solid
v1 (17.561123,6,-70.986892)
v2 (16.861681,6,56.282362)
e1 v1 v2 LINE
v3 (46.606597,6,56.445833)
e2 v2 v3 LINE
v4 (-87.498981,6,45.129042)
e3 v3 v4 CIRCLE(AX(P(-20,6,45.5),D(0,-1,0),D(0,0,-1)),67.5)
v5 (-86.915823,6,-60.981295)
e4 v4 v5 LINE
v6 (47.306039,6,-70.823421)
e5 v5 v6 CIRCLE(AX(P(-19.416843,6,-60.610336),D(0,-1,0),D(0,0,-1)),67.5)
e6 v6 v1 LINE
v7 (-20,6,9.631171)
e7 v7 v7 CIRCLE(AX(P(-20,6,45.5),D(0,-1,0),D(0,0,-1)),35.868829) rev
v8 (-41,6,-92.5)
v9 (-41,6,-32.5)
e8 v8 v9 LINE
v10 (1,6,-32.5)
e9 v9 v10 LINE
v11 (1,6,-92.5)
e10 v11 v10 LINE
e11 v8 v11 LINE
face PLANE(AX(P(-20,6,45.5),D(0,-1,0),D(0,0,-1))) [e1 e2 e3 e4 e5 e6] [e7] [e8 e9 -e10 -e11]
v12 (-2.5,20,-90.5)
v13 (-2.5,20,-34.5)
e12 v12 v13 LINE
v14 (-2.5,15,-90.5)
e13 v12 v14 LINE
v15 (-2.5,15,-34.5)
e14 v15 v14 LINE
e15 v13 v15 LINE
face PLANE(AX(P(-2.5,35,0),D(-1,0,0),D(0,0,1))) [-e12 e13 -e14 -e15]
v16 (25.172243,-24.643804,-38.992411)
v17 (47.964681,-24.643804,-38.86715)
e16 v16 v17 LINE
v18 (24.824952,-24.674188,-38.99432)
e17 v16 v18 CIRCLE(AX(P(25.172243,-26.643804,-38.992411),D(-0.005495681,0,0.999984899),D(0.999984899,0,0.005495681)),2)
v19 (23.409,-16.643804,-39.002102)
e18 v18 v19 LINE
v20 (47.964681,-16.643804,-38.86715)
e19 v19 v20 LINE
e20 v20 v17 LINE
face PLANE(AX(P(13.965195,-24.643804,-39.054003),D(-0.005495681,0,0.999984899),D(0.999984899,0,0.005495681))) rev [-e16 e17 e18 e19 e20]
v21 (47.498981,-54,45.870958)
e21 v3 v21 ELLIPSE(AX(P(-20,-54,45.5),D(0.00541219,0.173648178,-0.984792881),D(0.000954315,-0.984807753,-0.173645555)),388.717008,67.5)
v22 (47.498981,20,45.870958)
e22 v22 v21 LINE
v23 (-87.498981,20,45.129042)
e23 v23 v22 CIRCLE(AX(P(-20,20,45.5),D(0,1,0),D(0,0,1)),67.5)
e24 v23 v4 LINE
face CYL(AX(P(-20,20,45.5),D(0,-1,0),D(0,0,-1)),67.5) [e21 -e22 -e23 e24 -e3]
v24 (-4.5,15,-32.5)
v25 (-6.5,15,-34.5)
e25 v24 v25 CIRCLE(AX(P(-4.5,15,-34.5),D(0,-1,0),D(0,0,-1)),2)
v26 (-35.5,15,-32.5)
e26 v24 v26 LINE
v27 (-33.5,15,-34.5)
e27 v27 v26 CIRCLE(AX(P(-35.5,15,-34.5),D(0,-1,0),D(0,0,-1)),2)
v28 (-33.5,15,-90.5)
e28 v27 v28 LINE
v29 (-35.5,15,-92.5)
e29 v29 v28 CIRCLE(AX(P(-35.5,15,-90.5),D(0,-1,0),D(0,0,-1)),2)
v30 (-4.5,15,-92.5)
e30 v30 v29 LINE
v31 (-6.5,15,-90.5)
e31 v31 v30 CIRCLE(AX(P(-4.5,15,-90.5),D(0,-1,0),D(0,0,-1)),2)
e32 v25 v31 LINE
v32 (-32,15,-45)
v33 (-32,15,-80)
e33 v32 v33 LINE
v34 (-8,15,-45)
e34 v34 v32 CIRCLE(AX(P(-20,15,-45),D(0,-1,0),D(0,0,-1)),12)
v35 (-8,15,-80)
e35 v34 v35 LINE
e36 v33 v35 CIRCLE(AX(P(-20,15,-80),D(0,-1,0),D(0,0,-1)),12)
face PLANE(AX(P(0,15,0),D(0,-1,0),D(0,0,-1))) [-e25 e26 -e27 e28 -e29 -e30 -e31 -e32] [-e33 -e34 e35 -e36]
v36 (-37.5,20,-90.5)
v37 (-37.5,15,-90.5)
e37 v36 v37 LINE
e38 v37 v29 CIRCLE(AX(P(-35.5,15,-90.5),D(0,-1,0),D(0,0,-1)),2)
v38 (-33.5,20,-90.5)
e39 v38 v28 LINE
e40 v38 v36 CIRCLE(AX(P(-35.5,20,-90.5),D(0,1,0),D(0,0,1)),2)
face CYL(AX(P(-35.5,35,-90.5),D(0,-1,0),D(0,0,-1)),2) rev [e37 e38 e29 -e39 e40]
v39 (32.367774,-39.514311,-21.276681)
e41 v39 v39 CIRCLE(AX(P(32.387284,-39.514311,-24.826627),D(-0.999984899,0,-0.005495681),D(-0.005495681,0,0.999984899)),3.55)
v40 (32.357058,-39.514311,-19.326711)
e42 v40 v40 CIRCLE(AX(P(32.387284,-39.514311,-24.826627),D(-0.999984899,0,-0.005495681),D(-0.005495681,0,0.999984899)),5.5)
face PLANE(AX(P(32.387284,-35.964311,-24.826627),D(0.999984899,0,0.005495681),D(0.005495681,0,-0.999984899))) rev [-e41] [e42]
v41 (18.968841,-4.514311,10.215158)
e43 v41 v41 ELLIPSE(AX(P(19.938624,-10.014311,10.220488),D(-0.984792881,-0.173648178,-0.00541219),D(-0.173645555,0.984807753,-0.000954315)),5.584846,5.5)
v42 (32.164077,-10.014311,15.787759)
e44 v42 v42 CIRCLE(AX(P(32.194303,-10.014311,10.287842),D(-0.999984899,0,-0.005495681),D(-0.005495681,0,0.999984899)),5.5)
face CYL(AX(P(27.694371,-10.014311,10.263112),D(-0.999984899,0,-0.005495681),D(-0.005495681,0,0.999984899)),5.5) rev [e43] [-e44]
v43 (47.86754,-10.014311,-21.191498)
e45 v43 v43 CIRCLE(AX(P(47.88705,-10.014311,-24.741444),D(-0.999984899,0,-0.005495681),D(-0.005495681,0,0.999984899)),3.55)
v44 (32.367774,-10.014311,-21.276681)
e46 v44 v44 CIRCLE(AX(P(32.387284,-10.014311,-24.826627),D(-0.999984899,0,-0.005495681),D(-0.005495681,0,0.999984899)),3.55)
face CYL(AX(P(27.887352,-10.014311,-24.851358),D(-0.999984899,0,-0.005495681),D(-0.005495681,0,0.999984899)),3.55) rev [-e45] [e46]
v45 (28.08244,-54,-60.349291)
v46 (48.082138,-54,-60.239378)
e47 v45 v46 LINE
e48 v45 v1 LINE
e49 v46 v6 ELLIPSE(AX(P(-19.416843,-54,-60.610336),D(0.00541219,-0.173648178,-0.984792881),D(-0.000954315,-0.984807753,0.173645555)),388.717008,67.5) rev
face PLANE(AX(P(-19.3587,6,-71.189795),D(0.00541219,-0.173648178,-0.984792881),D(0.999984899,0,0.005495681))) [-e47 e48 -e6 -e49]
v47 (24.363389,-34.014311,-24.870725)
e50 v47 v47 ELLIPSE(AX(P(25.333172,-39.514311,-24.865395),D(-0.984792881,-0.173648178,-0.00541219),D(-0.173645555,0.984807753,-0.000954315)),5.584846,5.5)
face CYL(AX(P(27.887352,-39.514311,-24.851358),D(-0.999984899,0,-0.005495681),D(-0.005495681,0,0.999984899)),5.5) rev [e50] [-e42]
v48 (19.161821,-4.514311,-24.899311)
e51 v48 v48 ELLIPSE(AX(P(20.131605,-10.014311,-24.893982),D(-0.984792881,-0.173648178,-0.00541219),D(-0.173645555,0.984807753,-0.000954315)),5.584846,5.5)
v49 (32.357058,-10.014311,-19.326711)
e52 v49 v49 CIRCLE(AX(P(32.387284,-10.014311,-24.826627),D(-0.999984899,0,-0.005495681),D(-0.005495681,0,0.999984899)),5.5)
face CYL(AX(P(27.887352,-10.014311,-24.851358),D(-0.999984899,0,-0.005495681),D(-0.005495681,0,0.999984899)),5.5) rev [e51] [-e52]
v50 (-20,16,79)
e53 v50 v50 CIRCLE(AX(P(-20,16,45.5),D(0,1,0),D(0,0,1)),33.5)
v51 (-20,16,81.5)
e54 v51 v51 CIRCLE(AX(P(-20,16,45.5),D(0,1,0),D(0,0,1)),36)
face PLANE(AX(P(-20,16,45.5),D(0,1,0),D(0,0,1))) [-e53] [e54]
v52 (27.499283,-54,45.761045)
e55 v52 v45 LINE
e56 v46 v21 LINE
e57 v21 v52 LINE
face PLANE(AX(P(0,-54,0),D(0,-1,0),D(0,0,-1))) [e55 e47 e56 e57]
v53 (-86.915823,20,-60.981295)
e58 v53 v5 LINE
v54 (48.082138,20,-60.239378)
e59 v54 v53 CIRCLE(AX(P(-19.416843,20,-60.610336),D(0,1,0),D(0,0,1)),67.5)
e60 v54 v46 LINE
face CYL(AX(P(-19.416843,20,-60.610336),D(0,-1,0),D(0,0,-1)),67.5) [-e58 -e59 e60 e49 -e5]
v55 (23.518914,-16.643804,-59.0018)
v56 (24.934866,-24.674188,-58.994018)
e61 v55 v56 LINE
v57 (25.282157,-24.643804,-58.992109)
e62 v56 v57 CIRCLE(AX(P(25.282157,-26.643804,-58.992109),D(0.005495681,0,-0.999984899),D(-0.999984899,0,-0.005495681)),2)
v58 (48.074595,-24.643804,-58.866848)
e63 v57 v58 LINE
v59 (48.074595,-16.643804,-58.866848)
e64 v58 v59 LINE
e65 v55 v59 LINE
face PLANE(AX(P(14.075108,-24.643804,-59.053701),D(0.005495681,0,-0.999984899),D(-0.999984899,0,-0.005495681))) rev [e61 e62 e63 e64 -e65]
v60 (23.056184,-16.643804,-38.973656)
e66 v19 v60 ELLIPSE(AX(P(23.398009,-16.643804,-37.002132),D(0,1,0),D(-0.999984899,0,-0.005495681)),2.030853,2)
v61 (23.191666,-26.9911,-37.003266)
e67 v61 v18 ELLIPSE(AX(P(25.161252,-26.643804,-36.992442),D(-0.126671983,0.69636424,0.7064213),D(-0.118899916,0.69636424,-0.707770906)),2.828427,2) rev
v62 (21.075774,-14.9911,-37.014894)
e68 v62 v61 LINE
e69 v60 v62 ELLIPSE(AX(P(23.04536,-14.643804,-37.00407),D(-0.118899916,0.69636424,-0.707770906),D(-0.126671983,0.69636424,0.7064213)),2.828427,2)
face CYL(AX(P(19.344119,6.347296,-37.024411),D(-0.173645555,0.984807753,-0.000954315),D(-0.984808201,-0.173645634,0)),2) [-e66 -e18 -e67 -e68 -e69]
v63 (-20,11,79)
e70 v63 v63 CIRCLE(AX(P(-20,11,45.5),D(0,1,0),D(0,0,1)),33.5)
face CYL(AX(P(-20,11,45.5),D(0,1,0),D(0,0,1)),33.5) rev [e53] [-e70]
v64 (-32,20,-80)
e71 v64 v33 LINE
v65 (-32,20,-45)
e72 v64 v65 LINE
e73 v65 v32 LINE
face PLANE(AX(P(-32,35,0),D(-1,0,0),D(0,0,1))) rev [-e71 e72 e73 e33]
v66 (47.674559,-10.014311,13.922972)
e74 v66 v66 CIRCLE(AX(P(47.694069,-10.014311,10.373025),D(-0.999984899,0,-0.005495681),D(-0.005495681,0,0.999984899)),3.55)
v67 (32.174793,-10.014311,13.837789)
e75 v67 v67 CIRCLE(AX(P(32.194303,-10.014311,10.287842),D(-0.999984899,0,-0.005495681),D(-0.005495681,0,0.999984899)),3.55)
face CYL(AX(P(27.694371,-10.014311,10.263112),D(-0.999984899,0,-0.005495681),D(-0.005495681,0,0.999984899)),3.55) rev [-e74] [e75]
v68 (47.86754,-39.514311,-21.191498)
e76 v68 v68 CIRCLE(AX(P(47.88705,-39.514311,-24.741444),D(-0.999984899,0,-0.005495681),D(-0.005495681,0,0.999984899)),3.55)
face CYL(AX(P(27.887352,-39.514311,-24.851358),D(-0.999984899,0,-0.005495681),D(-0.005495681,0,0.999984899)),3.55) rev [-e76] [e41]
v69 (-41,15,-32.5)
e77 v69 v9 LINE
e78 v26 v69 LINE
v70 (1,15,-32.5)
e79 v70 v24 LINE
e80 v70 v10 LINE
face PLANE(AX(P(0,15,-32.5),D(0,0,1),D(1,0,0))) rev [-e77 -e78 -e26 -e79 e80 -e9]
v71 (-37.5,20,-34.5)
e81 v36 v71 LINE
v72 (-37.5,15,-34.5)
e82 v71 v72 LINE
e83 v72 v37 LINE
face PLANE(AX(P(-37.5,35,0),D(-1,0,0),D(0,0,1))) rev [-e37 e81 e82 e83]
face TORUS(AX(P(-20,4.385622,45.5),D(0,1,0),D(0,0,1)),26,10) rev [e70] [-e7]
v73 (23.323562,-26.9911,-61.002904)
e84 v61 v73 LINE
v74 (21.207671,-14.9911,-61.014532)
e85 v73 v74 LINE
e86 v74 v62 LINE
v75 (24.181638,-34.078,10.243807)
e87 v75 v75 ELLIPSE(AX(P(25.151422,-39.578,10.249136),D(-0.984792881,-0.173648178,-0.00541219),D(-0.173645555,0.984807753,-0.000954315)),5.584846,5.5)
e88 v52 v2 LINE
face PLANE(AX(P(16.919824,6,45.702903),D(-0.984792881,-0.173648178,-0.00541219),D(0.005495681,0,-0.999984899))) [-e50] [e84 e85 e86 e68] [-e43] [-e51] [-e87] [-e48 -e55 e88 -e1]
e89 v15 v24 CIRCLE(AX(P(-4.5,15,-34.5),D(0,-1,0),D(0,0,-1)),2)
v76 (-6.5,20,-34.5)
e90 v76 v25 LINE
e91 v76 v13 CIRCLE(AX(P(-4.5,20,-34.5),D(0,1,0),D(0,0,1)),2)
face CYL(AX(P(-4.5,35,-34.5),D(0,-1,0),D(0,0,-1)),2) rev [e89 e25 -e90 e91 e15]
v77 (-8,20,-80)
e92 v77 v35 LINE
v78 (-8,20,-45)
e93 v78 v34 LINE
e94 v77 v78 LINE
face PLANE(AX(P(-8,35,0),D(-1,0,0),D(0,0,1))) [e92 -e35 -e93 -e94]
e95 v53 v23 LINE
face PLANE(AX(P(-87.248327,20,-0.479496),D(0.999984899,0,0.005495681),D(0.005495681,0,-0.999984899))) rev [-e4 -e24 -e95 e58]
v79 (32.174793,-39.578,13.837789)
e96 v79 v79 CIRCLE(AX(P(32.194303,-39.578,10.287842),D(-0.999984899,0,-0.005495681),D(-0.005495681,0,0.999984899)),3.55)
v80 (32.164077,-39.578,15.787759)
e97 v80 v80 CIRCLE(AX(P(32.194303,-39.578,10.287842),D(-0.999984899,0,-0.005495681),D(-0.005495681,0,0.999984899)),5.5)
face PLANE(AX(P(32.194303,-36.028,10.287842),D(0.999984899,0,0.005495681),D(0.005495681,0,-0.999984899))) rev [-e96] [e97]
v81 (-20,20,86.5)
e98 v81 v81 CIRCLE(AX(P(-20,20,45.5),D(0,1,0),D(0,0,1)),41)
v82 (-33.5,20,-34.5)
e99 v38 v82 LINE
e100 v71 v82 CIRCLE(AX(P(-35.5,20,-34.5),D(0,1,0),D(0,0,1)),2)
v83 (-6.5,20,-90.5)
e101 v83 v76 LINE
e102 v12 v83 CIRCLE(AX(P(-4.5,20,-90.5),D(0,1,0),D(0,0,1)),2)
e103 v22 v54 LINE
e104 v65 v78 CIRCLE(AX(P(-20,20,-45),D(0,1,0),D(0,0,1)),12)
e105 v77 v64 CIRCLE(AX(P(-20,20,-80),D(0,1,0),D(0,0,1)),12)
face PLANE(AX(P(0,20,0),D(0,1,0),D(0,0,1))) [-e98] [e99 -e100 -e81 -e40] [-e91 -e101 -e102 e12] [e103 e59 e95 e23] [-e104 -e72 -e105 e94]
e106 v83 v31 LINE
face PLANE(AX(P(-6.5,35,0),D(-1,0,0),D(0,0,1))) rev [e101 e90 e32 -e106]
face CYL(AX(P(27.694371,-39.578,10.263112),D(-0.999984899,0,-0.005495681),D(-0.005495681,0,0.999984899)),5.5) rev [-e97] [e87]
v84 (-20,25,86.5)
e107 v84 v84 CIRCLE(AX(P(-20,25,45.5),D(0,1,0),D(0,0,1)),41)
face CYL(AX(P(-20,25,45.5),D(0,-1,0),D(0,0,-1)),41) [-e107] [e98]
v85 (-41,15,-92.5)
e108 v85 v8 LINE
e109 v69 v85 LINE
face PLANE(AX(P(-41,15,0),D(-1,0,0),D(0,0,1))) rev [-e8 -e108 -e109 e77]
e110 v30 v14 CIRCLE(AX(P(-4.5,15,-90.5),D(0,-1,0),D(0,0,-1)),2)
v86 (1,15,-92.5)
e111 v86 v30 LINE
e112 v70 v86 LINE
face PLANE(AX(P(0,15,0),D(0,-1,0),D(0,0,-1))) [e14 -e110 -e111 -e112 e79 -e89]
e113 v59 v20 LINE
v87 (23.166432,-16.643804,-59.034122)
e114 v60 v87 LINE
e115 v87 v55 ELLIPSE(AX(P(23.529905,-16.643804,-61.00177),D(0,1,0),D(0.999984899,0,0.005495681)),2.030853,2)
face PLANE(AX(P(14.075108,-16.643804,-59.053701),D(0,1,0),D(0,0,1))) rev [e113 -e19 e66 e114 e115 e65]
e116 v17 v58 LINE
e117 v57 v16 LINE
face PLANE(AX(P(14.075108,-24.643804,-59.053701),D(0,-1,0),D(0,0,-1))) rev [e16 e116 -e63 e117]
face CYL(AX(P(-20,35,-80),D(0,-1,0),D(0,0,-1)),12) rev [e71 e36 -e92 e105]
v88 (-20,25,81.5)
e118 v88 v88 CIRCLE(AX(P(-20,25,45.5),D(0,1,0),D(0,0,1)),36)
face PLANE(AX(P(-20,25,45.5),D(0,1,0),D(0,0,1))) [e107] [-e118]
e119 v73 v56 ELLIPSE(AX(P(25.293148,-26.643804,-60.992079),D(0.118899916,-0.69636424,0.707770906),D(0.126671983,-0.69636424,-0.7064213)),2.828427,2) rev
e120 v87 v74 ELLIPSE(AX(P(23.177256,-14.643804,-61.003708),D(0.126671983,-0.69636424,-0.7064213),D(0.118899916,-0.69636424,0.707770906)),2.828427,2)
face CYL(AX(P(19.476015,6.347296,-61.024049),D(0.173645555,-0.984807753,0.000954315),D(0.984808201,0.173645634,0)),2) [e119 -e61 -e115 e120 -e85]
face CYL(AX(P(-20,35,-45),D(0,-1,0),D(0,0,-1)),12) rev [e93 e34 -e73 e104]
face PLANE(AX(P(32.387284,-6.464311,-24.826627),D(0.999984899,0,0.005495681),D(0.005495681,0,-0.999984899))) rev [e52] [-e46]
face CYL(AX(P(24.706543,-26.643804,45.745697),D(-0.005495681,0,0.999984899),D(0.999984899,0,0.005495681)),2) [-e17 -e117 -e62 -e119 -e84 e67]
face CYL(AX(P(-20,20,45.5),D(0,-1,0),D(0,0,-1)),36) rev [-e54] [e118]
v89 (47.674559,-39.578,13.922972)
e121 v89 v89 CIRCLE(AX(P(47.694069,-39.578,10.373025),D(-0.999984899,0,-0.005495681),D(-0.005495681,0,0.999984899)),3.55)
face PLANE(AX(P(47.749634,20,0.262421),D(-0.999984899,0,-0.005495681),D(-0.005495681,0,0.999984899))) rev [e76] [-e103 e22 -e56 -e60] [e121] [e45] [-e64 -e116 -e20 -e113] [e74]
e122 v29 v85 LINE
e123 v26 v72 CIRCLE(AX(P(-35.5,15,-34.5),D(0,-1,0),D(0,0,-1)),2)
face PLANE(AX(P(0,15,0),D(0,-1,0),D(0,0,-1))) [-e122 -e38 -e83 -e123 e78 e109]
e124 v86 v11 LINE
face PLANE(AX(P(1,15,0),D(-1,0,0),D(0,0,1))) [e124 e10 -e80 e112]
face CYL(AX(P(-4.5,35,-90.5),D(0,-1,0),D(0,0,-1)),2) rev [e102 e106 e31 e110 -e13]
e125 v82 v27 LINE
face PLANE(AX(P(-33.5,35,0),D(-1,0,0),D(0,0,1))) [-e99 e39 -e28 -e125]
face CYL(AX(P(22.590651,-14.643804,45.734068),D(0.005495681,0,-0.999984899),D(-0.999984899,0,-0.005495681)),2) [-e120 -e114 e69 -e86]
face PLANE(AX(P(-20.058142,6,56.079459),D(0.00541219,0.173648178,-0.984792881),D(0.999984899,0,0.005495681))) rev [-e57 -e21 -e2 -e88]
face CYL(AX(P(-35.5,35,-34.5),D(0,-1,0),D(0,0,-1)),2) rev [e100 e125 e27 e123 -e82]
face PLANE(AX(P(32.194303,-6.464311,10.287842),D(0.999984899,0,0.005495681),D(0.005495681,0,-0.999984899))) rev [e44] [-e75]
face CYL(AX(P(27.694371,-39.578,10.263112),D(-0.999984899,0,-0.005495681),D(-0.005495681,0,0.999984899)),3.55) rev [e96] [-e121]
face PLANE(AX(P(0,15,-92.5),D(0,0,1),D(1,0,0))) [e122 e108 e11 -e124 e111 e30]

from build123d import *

# Parameters (mm, degrees)
BOSS_EXTRUDE1_DEPTH              = 20
SKETCH8_W                        = 42
SKETCH8_H                        = 60
CUT_EXTRUDE1_DEPTH               = 15
CUT_EXTRUDE2_START               = -5
CUT_EXTRUDE2_DEPTH               = 5
SKETCH10_R                       = 36
CUT_EXTRUDE3_DEPTH               = 157.424129235
SKETCH11_R                       = 41
SKETCH11_R_2                     = 36
BOSS_EXTRUDE4_DEPTH              = 5
SKETCH13_W                       = 106.111938503
SKETCH13_H                       = 55
SKETCH13_R                       = 3
BOSS_EXTRUDE9_DEPTH              = 20
BOSS_EXTRUDE13_START             = -5
SKETCH14_R                       = 36
SKETCH14_R_2                     = 33.5
BOSS_EXTRUDE13_DEPTH             = 5
FILLET1_R                        = 10
CUT_EXTRUDE4_DEPTH               = 6
CBORE_FOR_M6_5_SHSS1_D           = 7.1
CBORE_FOR_M6_5_SHSS1_CBORE_D     = 11
CBORE_FOR_M6_5_SHSS1_CBORE_DEPTH = 4.5
CHAMFER5_SIZE                    = 10.579618843
CHAMFER5_SIZE_2                  = 60
CUT_EXTRUDE5_DEPTH               = 1
SKETCH23_W                       = 20
SKETCH23_H                       = 8
CUT_EXTRUDE6_DEPTH               = 34
FILLET5_R                        = 2


with BuildPart() as part:
    # Sketch1 → Boss-Extrude1 (new body)
    with BuildSketch(Plane(origin=(0, 0, 0), x_dir=(1, 0, 0), z_dir=(0, 1, 0))):
        with BuildLine():
            Line((48.082138056, 60.239377577), (47.498980657, -45.87095849))
            ThreePointArc((47.498980657, -45.87095849), (-20.370958489, -112.998980658), (-87.498980658, -45.129041511))
            Line((-87.498980658, -45.129041511), (-86.915823259, 60.981294555))
            ThreePointArc((-86.915823259, 60.981294555), (-19.045884112, 128.109316723), (48.082138056, 60.239377577))
        make_face()
    extrude(amount=BOSS_EXTRUDE1_DEPTH)

    # Sketch8 → Cut-Extrude1 (cut)
    with BuildSketch(Plane.XZ):
        with Locations((-20, -62.5)):
            Rectangle(SKETCH8_W, SKETCH8_H)
    extrude(amount=-CUT_EXTRUDE1_DEPTH, mode=Mode.SUBTRACT)

    # Cut-Extrude2: read off the stored shape, not the designer's step
    # Cut-Extrude2 outline → Cut-Extrude2 (cut)
    with BuildSketch(Plane.XZ.offset(-15).offset(CUT_EXTRUDE2_START)):
        with BuildLine():
            Line((-6.5, -34.5), (-6.5, -90.5))
            ThreePointArc((-6.5, -90.5), (-4.5, -92.5), (-2.5, -90.5))
            Line((-2.5, -90.5), (-2.5, -34.5))
            ThreePointArc((-2.5, -34.5), (-4.5, -32.5), (-6.5, -34.5))
        make_face()
        with BuildLine():
            ThreePointArc((-8, -45), (-20, -33), (-32, -45))
            Line((-32, -45), (-32, -80))
            ThreePointArc((-32, -80), (-20, -92), (-8, -80))
            Line((-8, -80), (-8, -45))
        make_face()
        with BuildLine():
            Line((-37.5, -34.5), (-37.5, -90.5))
            ThreePointArc((-37.5, -90.5), (-35.5, -92.5), (-33.5, -90.5))
            Line((-33.5, -90.5), (-33.5, -34.5))
            ThreePointArc((-33.5, -34.5), (-35.5, -32.5), (-37.5, -34.5))
        make_face()
    extrude(amount=CUT_EXTRUDE2_DEPTH, mode=Mode.SUBTRACT)

    # Sketch10 → Cut-Extrude3 (cut, through all)
    with BuildSketch(Plane.XZ):
        with Locations(Location((-20, 45.5, 0), (0, 0, 270))):
            Circle(SKETCH10_R)
    extrude(amount=-CUT_EXTRUDE3_DEPTH, mode=Mode.SUBTRACT)

    # Sketch11 → Boss-Extrude4 (add)
    with BuildSketch(Plane(origin=(0, 20, 0), x_dir=(1, 0, 0), z_dir=(0, 1, 0))):
        with Locations(Location((-20, -45.5, 0), (0, 0, 270))):
            Circle(SKETCH11_R)
        with Locations(Location((-20, -45.5, 0), (0, 0, 90))):
            Circle(SKETCH11_R_2, mode=Mode.SUBTRACT)
    extrude(amount=BOSS_EXTRUDE4_DEPTH)

    # Sketch13 → Boss-Extrude9 (add)
    with BuildSketch(Plane(origin=(27.749936459, 0, 0.152507111), x_dir=(-0.00549568132488102, 0, 0.999984898629362), z_dir=(-0.999984898629362, 0, -0.00549568132488102))):
        with Locations((-7.446742736, -27.5)):
            Rectangle(SKETCH13_W, SKETCH13_H)
        with Locations((-25.004242736, -10.014310552)):
            Circle(SKETCH13_R, mode=Mode.SUBTRACT)
        with Locations((10.110757264, -10.014310552)):
            Circle(SKETCH13_R, mode=Mode.SUBTRACT)
        with Locations((10.110757264, -39.577999726)):
            Circle(SKETCH13_R, mode=Mode.SUBTRACT)
        with Locations((-25.004242736, -39.514310552)):
            Circle(SKETCH13_R, mode=Mode.SUBTRACT)
    extrude(amount=-BOSS_EXTRUDE9_DEPTH)

    # Sketch14 → Boss-Extrude13 (add)
    with BuildSketch(Plane(origin=(0, 16, 0), x_dir=(1, 0, 0), z_dir=(0, 1, 0)).offset(BOSS_EXTRUDE13_START)):
        with Locations(Location((-20, -45.5, 0), (0, 0, 90))):
            Circle(SKETCH14_R)
        with Locations(Location((-20, -45.5, 0), (0, 0, 270))):
            Circle(SKETCH14_R_2, mode=Mode.SUBTRACT)
    extrude(amount=BOSS_EXTRUDE13_DEPTH)

    # Fillet1
    # the kernel refuses this fillet: 10 mm, written as the material it adds along each edge
    with BuildSketch(Plane(origin=(-20, 11, 45.5), x_dir=(0, 0, -1), z_dir=(1, 0, 0))) as fillet1_piece_1:
        with BuildLine():
            CenterArc((26, -6.614378278), FILLET1_R, 0, 41.409622109)
            Line((36, -6.614378278), (36.2, -6.614378278))
            Line((36.2, -6.614378278), (36.2, 0))
            Line((36.2, 0), (36, 0.2))
            ThreePointArc((36, 0.2), (34.75, 0.2), (33.65, 0.132287566))
            Line((33.65, 0.132287566), (33.5, 0))
        make_face()
    revolve(axis=Axis((-20, 11, 45.5), (0, 1, 0)))

    # Sketch15 → Cut-Extrude4 (cut)
    with BuildSketch(Plane.XZ):
        with BuildLine():
            Line((27.499282685, 45.761044864), (47.498980657, 45.87095849))
            ThreePointArc((47.498980657, 45.87095849), (-20.370958489, 112.998980658), (-87.498980658, 45.129041511))
            Line((-87.498980658, 45.129041511), (-86.915823259, -60.981294555))
            ThreePointArc((-86.915823259, -60.981294555), (-19.045884112, -128.109316723), (48.082138056, -60.239377577))
            Line((48.082138056, -60.239377577), (28.082440084, -60.349291203))
            Line((28.082440084, -60.349291203), (27.499282685, 45.761044864))
        make_face()
    extrude(amount=-CUT_EXTRUDE4_DEPTH, mode=Mode.SUBTRACT)

    # CBORE for M6.5 SHSS1 (through all)
    with Locations(Plane(origin=(27.749936459, 0, 0.152507111), x_dir=(-0.005495681324881029, 0, 0.999984898629362), z_dir=(-0.999984898629362, 0, -0.005495681324881029))):
        with Locations((10.110757264, -39.577999726), (-25.004242736, -39.514310552), (10.110757264, -10.014310552), (-25.004242736, -10.014310552)):
            CounterBoreHole(CBORE_FOR_M6_5_SHSS1_D / 2, CBORE_FOR_M6_5_SHSS1_CBORE_D / 2, CBORE_FOR_M6_5_SHSS1_CBORE_DEPTH)

    # Chamfer5
    # the kernel refuses this chamfer: 60, 10.579618843 mm, written as the material it adds along each edge
    with BuildSketch(Plane(origin=(28.939284552, 6, -216.259264498), x_dir=(-0.9999848986293619, 0, -0.00549568132488103), z_dir=(-0.00549568132488103, 0, 0.999984898629362))) as chamfer5_piece_1_section:
        Polygon((CHAMFER5_SIZE, 0), (0, CHAMFER5_SIZE_2), (0, 0), align=None)
    chamfer5_piece_1 = extrude(amount=417.936594073, mode=Mode.PRIVATE)
    chamfer5_piece_1 = chamfer5_piece_1 - Plane(origin=(27.887351809, -10.014310552, -24.851358027), x_dir=(-0.005495681324881029, 0, 0.999984898629362), z_dir=(-0.999984898629362, 0, -0.005495681324881029)) * Cylinder(5.5, 1076, mode=Mode.PRIVATE)
    chamfer5_piece_1 = chamfer5_piece_1 - Plane(origin=(27.694370959, -10.014310552, 10.263111688), x_dir=(-0.005495681324881029, 0, 0.999984898629362), z_dir=(-0.999984898629362, 0, -0.005495681324881029)) * Cylinder(5.5, 1076, mode=Mode.PRIVATE)
    chamfer5_piece_1 = chamfer5_piece_1 - Plane(origin=(27.887351809, -39.514310552, -24.851358027), x_dir=(-0.005495681324881029, 0, 0.999984898629362), z_dir=(-0.999984898629362, 0, -0.005495681324881029)) * Cylinder(5.5, 1076, mode=Mode.PRIVATE)
    chamfer5_piece_1 = chamfer5_piece_1 - Plane(origin=(27.694370959, -39.577999726, 10.263111688), x_dir=(-0.005495681324881029, 0, 0.999984898629362), z_dir=(-0.999984898629362, 0, -0.005495681324881029)) * Cylinder(5.5, 1076, mode=Mode.PRIVATE)
    chamfer5_piece_1 = split(chamfer5_piece_1, bisect_by=Plane(origin=(27.486315043, -40.618009932, 48.120615135), z_dir=(0.0054121895768273285, 0.17364817766693125, -0.9847928810653225)), keep=Keep.TOP, mode=Mode.PRIVATE)
    chamfer5_piece_1 = split(chamfer5_piece_1, bisect_by=Plane(origin=(28.164666117, 30.853356971, -75.311001495), z_dir=(-0.00541218957682626, 0.17364817766693136, 0.9847928810653225)), keep=Keep.TOP, mode=Mode.PRIVATE)
    add(chamfer5_piece_1)
    with BuildSketch(Plane(origin=(203.992111352, 6, -59.382533108), x_dir=(0.005495681324880034, 0, -0.9999848986293619), z_dir=(-0.999984898629362, 0, -0.005495681324880034))) as chamfer5_piece_2_section:
        Polygon((CHAMFER5_SIZE, 0), (0, CHAMFER5_SIZE_2), (0, 0), align=None)
    chamfer5_piece_2 = extrude(amount=331.824655571, mode=Mode.PRIVATE)
    chamfer5_piece_2 = chamfer5_piece_2 & Plane(origin=(-19.416842601, 6, -60.610336066), x_dir=(-0.999984898629362, 0, -0.005495681324881549), z_dir=(0, -1, 0)) * Cylinder(67.5, 904, mode=Mode.PRIVATE)
    chamfer5_piece_2 = split(chamfer5_piece_2, bisect_by=Plane(origin=(23.126316359, -25.892001157, -60.376528891), z_dir=(0.9847928810653225, 0.1736481776669314, 0.005412189576827241)), keep=Keep.TOP, mode=Mode.PRIVATE)
    add(chamfer5_piece_2)
    with BuildSketch(Plane(origin=(-128.410690611, 6, 44.904200396), x_dir=(-0.005495681324881117, 0, 0.9999848986293619), z_dir=(0.999984898629362, 0, 0.005495681324881118))) as chamfer5_piece_3_section:
        Polygon((CHAMFER5_SIZE, 0), (0, CHAMFER5_SIZE_2), (0, 0), align=None)
    chamfer5_piece_3 = extrude(amount=331.824655571, mode=Mode.PRIVATE)
    chamfer5_piece_3 = chamfer5_piece_3 & Plane(origin=(-20, 6, 45.500000001), x_dir=(0.999984898629362, 0, 0.0054956813248813385), z_dir=(0, -1, 0)) * Cylinder(67.5, 904, mode=Mode.PRIVATE)
    chamfer5_piece_3 = split(chamfer5_piece_3, bisect_by=Plane(origin=(12.537572393, 30.853356971, 45.67881883), z_dir=(0.9847928810653225, 0.1736481776669314, 0.005412189576827241)), keep=Keep.TOP, mode=Mode.PRIVATE)
    add(chamfer5_piece_3)

    # Sketch22 → Cut-Extrude5 (cut)
    with BuildSketch(Plane.XZ.offset(55)):
        Polygon((27.499282685, 45.761044864), (28.082440084, -60.349291203), (48.082138056, -60.239377577), (47.498980657, 45.87095849), align=None)
    extrude(amount=-CUT_EXTRUDE5_DEPTH, mode=Mode.SUBTRACT)

    # Sketch23 → Cut-Extrude6 (cut)
    with BuildSketch(Plane(origin=(47.749634432, 0, 0.262420737), x_dir=(0.005495681324880889, 0, -0.999984898629362), z_dir=(0.999984898629362, 0, 0.005495681324880889))):
        with Locations((49.130161201, -20.643803513)):
            Rectangle(SKETCH23_W, SKETCH23_H)
    extrude(amount=-CUT_EXTRUDE6_DEPTH, mode=Mode.SUBTRACT)

    # Fillet5
    fillet5_edges = [part.edges().sort_by_distance(p)[0] for p in [
        (21.433134302, -16.643803513, -49.01311169),
        (22.083474761, -20.643803513, -39.009386557),
        (22.843728846, -24.643803513, -49.005359395),
        (22.193388387, -20.643803513, -59.009084529),
    ]]
    fillet(fillet5_edges, radius=FILLET5_R)


solid = part.part
